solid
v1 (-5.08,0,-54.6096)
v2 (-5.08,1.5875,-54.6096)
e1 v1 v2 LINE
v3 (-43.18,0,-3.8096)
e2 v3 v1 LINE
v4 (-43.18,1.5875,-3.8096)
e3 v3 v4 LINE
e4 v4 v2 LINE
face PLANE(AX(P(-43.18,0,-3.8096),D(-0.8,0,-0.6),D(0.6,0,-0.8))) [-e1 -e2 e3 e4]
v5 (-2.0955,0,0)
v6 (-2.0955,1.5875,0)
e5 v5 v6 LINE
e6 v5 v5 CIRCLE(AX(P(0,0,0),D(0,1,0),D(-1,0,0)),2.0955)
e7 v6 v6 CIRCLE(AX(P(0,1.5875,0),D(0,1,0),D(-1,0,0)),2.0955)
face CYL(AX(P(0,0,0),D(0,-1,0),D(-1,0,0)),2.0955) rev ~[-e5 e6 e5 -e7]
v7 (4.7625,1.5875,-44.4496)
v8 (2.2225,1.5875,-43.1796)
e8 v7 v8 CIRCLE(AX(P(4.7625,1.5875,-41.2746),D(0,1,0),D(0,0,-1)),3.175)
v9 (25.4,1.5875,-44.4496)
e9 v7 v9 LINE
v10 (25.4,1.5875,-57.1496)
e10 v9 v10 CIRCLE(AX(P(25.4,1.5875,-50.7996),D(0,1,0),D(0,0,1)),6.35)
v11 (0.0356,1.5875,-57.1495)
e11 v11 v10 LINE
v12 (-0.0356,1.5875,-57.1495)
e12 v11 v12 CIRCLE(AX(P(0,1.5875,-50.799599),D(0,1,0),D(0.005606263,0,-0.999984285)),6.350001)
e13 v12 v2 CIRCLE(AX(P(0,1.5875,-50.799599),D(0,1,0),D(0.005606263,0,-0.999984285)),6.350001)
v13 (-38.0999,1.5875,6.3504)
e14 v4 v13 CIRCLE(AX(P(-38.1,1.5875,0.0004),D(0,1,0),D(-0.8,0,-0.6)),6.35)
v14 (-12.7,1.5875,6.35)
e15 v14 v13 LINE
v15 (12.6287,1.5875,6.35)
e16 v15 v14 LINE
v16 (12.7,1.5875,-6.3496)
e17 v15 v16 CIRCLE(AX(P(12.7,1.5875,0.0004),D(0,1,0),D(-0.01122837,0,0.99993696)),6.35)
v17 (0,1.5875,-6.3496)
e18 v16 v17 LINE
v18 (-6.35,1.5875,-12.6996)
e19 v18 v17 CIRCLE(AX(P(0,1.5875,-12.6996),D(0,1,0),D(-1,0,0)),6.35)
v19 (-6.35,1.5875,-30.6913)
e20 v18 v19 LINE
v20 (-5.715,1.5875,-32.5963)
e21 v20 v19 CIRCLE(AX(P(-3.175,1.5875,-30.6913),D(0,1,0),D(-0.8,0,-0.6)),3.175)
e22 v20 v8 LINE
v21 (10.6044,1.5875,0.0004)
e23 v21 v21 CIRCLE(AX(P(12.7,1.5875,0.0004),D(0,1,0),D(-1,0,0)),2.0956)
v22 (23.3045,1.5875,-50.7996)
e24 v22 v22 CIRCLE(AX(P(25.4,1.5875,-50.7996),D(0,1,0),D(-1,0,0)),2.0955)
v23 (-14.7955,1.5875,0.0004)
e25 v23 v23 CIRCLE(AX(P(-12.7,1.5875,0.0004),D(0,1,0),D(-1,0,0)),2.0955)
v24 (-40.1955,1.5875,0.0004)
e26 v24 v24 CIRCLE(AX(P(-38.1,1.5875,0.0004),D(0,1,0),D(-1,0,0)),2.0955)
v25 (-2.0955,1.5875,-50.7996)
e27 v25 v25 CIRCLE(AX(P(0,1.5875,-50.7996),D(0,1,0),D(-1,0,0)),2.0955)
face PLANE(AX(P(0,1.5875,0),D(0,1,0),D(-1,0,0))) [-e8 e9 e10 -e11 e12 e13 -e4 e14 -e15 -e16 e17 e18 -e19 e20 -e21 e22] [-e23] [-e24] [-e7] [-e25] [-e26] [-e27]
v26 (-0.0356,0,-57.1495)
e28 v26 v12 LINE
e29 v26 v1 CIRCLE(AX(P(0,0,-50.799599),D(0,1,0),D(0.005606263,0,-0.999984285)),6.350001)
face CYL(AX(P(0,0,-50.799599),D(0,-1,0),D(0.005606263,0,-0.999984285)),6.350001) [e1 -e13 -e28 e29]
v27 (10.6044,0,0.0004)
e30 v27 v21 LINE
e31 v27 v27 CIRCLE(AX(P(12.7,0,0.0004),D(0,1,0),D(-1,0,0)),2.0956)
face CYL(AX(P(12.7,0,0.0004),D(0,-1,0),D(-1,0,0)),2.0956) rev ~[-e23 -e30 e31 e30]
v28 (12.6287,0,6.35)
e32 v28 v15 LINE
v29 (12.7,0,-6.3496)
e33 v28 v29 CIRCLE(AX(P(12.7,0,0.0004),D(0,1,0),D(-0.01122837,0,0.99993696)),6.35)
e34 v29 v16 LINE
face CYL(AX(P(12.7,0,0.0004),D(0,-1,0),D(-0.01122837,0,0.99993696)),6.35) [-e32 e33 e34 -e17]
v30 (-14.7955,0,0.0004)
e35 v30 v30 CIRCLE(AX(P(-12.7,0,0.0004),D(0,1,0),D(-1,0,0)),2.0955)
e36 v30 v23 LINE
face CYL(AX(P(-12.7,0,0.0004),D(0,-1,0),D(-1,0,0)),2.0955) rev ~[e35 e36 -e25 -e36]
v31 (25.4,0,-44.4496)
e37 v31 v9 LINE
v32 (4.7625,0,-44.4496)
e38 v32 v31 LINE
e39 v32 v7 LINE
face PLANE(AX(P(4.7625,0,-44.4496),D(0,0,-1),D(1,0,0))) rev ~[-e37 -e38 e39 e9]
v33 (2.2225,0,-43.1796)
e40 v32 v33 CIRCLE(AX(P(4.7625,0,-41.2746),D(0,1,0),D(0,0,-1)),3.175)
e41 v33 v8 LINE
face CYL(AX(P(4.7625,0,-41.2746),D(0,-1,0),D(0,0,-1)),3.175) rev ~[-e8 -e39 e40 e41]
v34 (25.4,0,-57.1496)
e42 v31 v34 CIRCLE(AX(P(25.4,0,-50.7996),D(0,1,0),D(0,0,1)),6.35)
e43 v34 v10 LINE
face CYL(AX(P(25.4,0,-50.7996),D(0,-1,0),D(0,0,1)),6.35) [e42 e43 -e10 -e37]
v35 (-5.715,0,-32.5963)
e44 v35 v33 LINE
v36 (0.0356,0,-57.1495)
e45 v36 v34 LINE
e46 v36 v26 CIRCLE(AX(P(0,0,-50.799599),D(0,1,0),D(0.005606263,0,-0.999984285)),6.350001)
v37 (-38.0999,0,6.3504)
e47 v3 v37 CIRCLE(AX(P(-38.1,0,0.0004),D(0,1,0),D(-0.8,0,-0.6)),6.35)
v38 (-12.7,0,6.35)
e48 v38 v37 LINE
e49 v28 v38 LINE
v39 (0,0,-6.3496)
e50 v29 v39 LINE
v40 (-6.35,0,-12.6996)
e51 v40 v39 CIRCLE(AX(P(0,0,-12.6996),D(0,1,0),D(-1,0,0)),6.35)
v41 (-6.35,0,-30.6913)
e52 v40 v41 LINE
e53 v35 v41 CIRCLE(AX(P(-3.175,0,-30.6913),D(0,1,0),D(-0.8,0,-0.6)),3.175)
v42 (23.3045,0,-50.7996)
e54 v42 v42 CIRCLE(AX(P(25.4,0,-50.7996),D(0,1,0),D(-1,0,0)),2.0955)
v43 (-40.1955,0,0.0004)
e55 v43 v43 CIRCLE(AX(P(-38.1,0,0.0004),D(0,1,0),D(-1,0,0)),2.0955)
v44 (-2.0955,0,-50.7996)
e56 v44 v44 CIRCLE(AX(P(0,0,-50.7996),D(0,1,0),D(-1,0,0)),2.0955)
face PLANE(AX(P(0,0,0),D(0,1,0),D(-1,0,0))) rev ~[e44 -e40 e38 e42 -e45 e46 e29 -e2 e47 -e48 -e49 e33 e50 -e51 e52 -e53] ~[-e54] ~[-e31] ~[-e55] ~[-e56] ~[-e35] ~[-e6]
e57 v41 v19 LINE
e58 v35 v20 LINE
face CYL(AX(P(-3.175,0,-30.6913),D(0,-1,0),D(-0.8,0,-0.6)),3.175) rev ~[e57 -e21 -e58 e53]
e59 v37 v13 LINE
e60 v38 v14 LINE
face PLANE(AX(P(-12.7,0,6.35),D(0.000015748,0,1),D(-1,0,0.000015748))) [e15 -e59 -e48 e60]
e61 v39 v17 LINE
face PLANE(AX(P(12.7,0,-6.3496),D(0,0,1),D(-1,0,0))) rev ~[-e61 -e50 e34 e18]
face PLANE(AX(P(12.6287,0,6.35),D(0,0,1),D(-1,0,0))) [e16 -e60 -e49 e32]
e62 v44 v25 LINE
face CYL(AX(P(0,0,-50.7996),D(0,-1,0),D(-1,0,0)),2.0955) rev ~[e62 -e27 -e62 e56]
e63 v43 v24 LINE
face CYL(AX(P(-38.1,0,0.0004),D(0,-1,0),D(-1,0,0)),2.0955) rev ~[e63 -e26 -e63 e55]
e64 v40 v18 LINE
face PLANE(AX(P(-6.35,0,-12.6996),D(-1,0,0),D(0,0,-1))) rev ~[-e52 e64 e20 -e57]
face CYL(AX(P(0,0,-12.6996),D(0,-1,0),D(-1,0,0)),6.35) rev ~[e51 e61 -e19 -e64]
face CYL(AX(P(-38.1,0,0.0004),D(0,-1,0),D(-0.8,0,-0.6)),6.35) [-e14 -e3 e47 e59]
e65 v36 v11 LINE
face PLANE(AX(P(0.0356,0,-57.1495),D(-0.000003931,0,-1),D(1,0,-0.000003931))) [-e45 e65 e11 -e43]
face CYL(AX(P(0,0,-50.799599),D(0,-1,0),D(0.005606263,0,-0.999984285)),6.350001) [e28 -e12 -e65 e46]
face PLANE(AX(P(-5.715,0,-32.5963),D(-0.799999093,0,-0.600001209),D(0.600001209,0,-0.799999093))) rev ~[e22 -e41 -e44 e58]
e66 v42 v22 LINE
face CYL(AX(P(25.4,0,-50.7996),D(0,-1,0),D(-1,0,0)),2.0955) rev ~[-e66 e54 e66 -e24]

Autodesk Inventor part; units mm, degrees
ref_plane "YZ Plane" through (0, 0, 0) normal (1, 0, 0) x (0, 1, 0)
ref_plane "XZ Plane" through (0, 0, 0) normal (0, 1, 0) x (-1, 0, 0)
ref_plane "XY Plane" through (0, 0, 0) normal (0, 0, 1) x (1, 0, 0)
sketch "main" plane through (0, 0, 0) normal (0, 0, 1) x (1, 0, 0)
  arc A0 (-6.1043, -28.9805) -> (-0.9888, -26.4406) centre (-6.0688, -22.6306) ccw
  arc A1 (-31.4687, -16.2806) -> (-31.4687, -28.9806) centre (-31.4688, -22.6306) ccw
  circle A2 centre (-6.0688, -22.6306) radius 2.0955
  circle A3 centre (-31.4688, -22.6306) radius 2.0955
  line L0 (-10.8313, -16.2806) -> (-31.4688, -16.2806)
  line L1 (-6.0331, -28.9805) -> (-31.4687, -28.9806)
  circle A4 centre (-6.0688, 28.169) radius 2.0955
  circle A5 centre (6.6312, 28.1694) radius 2.0955
  line L2 (0.2812, 15.4694) -> (0.2812, -2.5222)
  line L3 (37.1112, 24.3594) -> (-0.9888, -26.4406)
  line L4 (-18.7688, 21.8194) -> (-6.0688, 21.8194)
  arc A6 (0.2812, 15.4694) -> (-6.0688, 21.8194) centre (-6.0688, 15.4694) ccw
  arc A7 (-18.6975, 34.519) -> (-18.7688, 21.8194) centre (-18.7688, 28.1694) ccw
  line L5 (-18.6975, 34.519) -> (6.6312, 34.519)
  circle A8 centre (32.0312, 28.1694) radius 2.0955
  arc A9 (37.1112, 24.3594) -> (32.0311, 34.5194) centre (32.0312, 28.1694) ccw
  line L6 (6.6311, 34.519) -> (32.0311, 34.5194)
  circle A10 centre (-18.7688, 28.1694) radius 2.0956
  line L7 (-0.3538, -4.4272) -> (-8.2913, -15.0106)
  arc A11 (-10.8313, -16.2806) -> (-8.2913, -15.0106) centre (-10.8313, -13.1056) ccw
  arc A12 (-0.3538, -4.4272) -> (0.2812, -2.5222) centre (-2.8938, -2.5222) ccw
  point P0 (-4.0049, 2.2465)
  point P1 (0.2812, -3.5806)
  dimension "d0" = 4.191
  dimension "d1" = 4.191
  dimension "d2" = 12.7
  dimension "d4" = 6.35
  dimension "d7" = 6.35
  dimension "d8" = 25.4
  dimension "d9" = 3.175
sketch "Sketch1" plane through (0, 0, 0) normal (0, 1, 0) x (-1, 0, 0)
  arc A0 (-0.0356, -57.1495) -> (5.08, -54.6096) centre (0, -50.7996) ccw
  arc A1 (-25.4, -44.4496) -> (-25.4, -57.1496) centre (-25.4, -50.7996) ccw
  circle A2 centre (0, -50.7996) radius 2.0955
  circle A3 centre (-25.4, -50.7996) radius 2.0955
  line L0 (-4.7625, -44.4496) -> (-25.4, -44.4496)
  line L1 (0.0356, -57.1495) -> (-25.4, -57.1496)
  circle A4 centre (0, 0) radius 2.0955
  circle A5 centre (12.7, 0.0004) radius 2.0955
  line L2 (6.35, -12.6996) -> (6.35, -30.6913)
  line L3 (43.18, -3.8096) -> (5.08, -54.6096)
  line L4 (-12.7, -6.3496) -> (0, -6.3496)
  arc A6 (6.35, -12.6996) -> (0, -6.3496) centre (0, -12.6996) ccw
  arc A7 (-12.6287, 6.35) -> (-12.7, -6.3496) centre (-12.7, 0.0004) ccw
  line L5 (-12.6287, 6.35) -> (12.7, 6.35)
  circle A8 centre (38.1, 0.0004) radius 2.0955
  arc A9 (43.18, -3.8096) -> (38.0999, 6.3504) centre (38.1, 0.0004) ccw
  line L6 (12.6999, 6.35) -> (38.0999, 6.3504)
  circle A10 centre (-12.7, 0.0004) radius 2.0956
  line L7 (5.715, -32.5963) -> (-2.2225, -43.1796)
  arc A11 (-4.7625, -44.4496) -> (-2.2225, -43.1796) centre (-4.7625, -41.2746) ccw
  arc A12 (5.715, -32.5963) -> (6.35, -30.6913) centre (3.175, -30.6913) ccw
  point P0 (12.7, 6.35)
  point P1 (12.7, 6.35)
extrude "Extrusion1" add sketch "Sketch1" along normal blind 1.5875
properties part number "gusset" material "Acetal Resin, White"
